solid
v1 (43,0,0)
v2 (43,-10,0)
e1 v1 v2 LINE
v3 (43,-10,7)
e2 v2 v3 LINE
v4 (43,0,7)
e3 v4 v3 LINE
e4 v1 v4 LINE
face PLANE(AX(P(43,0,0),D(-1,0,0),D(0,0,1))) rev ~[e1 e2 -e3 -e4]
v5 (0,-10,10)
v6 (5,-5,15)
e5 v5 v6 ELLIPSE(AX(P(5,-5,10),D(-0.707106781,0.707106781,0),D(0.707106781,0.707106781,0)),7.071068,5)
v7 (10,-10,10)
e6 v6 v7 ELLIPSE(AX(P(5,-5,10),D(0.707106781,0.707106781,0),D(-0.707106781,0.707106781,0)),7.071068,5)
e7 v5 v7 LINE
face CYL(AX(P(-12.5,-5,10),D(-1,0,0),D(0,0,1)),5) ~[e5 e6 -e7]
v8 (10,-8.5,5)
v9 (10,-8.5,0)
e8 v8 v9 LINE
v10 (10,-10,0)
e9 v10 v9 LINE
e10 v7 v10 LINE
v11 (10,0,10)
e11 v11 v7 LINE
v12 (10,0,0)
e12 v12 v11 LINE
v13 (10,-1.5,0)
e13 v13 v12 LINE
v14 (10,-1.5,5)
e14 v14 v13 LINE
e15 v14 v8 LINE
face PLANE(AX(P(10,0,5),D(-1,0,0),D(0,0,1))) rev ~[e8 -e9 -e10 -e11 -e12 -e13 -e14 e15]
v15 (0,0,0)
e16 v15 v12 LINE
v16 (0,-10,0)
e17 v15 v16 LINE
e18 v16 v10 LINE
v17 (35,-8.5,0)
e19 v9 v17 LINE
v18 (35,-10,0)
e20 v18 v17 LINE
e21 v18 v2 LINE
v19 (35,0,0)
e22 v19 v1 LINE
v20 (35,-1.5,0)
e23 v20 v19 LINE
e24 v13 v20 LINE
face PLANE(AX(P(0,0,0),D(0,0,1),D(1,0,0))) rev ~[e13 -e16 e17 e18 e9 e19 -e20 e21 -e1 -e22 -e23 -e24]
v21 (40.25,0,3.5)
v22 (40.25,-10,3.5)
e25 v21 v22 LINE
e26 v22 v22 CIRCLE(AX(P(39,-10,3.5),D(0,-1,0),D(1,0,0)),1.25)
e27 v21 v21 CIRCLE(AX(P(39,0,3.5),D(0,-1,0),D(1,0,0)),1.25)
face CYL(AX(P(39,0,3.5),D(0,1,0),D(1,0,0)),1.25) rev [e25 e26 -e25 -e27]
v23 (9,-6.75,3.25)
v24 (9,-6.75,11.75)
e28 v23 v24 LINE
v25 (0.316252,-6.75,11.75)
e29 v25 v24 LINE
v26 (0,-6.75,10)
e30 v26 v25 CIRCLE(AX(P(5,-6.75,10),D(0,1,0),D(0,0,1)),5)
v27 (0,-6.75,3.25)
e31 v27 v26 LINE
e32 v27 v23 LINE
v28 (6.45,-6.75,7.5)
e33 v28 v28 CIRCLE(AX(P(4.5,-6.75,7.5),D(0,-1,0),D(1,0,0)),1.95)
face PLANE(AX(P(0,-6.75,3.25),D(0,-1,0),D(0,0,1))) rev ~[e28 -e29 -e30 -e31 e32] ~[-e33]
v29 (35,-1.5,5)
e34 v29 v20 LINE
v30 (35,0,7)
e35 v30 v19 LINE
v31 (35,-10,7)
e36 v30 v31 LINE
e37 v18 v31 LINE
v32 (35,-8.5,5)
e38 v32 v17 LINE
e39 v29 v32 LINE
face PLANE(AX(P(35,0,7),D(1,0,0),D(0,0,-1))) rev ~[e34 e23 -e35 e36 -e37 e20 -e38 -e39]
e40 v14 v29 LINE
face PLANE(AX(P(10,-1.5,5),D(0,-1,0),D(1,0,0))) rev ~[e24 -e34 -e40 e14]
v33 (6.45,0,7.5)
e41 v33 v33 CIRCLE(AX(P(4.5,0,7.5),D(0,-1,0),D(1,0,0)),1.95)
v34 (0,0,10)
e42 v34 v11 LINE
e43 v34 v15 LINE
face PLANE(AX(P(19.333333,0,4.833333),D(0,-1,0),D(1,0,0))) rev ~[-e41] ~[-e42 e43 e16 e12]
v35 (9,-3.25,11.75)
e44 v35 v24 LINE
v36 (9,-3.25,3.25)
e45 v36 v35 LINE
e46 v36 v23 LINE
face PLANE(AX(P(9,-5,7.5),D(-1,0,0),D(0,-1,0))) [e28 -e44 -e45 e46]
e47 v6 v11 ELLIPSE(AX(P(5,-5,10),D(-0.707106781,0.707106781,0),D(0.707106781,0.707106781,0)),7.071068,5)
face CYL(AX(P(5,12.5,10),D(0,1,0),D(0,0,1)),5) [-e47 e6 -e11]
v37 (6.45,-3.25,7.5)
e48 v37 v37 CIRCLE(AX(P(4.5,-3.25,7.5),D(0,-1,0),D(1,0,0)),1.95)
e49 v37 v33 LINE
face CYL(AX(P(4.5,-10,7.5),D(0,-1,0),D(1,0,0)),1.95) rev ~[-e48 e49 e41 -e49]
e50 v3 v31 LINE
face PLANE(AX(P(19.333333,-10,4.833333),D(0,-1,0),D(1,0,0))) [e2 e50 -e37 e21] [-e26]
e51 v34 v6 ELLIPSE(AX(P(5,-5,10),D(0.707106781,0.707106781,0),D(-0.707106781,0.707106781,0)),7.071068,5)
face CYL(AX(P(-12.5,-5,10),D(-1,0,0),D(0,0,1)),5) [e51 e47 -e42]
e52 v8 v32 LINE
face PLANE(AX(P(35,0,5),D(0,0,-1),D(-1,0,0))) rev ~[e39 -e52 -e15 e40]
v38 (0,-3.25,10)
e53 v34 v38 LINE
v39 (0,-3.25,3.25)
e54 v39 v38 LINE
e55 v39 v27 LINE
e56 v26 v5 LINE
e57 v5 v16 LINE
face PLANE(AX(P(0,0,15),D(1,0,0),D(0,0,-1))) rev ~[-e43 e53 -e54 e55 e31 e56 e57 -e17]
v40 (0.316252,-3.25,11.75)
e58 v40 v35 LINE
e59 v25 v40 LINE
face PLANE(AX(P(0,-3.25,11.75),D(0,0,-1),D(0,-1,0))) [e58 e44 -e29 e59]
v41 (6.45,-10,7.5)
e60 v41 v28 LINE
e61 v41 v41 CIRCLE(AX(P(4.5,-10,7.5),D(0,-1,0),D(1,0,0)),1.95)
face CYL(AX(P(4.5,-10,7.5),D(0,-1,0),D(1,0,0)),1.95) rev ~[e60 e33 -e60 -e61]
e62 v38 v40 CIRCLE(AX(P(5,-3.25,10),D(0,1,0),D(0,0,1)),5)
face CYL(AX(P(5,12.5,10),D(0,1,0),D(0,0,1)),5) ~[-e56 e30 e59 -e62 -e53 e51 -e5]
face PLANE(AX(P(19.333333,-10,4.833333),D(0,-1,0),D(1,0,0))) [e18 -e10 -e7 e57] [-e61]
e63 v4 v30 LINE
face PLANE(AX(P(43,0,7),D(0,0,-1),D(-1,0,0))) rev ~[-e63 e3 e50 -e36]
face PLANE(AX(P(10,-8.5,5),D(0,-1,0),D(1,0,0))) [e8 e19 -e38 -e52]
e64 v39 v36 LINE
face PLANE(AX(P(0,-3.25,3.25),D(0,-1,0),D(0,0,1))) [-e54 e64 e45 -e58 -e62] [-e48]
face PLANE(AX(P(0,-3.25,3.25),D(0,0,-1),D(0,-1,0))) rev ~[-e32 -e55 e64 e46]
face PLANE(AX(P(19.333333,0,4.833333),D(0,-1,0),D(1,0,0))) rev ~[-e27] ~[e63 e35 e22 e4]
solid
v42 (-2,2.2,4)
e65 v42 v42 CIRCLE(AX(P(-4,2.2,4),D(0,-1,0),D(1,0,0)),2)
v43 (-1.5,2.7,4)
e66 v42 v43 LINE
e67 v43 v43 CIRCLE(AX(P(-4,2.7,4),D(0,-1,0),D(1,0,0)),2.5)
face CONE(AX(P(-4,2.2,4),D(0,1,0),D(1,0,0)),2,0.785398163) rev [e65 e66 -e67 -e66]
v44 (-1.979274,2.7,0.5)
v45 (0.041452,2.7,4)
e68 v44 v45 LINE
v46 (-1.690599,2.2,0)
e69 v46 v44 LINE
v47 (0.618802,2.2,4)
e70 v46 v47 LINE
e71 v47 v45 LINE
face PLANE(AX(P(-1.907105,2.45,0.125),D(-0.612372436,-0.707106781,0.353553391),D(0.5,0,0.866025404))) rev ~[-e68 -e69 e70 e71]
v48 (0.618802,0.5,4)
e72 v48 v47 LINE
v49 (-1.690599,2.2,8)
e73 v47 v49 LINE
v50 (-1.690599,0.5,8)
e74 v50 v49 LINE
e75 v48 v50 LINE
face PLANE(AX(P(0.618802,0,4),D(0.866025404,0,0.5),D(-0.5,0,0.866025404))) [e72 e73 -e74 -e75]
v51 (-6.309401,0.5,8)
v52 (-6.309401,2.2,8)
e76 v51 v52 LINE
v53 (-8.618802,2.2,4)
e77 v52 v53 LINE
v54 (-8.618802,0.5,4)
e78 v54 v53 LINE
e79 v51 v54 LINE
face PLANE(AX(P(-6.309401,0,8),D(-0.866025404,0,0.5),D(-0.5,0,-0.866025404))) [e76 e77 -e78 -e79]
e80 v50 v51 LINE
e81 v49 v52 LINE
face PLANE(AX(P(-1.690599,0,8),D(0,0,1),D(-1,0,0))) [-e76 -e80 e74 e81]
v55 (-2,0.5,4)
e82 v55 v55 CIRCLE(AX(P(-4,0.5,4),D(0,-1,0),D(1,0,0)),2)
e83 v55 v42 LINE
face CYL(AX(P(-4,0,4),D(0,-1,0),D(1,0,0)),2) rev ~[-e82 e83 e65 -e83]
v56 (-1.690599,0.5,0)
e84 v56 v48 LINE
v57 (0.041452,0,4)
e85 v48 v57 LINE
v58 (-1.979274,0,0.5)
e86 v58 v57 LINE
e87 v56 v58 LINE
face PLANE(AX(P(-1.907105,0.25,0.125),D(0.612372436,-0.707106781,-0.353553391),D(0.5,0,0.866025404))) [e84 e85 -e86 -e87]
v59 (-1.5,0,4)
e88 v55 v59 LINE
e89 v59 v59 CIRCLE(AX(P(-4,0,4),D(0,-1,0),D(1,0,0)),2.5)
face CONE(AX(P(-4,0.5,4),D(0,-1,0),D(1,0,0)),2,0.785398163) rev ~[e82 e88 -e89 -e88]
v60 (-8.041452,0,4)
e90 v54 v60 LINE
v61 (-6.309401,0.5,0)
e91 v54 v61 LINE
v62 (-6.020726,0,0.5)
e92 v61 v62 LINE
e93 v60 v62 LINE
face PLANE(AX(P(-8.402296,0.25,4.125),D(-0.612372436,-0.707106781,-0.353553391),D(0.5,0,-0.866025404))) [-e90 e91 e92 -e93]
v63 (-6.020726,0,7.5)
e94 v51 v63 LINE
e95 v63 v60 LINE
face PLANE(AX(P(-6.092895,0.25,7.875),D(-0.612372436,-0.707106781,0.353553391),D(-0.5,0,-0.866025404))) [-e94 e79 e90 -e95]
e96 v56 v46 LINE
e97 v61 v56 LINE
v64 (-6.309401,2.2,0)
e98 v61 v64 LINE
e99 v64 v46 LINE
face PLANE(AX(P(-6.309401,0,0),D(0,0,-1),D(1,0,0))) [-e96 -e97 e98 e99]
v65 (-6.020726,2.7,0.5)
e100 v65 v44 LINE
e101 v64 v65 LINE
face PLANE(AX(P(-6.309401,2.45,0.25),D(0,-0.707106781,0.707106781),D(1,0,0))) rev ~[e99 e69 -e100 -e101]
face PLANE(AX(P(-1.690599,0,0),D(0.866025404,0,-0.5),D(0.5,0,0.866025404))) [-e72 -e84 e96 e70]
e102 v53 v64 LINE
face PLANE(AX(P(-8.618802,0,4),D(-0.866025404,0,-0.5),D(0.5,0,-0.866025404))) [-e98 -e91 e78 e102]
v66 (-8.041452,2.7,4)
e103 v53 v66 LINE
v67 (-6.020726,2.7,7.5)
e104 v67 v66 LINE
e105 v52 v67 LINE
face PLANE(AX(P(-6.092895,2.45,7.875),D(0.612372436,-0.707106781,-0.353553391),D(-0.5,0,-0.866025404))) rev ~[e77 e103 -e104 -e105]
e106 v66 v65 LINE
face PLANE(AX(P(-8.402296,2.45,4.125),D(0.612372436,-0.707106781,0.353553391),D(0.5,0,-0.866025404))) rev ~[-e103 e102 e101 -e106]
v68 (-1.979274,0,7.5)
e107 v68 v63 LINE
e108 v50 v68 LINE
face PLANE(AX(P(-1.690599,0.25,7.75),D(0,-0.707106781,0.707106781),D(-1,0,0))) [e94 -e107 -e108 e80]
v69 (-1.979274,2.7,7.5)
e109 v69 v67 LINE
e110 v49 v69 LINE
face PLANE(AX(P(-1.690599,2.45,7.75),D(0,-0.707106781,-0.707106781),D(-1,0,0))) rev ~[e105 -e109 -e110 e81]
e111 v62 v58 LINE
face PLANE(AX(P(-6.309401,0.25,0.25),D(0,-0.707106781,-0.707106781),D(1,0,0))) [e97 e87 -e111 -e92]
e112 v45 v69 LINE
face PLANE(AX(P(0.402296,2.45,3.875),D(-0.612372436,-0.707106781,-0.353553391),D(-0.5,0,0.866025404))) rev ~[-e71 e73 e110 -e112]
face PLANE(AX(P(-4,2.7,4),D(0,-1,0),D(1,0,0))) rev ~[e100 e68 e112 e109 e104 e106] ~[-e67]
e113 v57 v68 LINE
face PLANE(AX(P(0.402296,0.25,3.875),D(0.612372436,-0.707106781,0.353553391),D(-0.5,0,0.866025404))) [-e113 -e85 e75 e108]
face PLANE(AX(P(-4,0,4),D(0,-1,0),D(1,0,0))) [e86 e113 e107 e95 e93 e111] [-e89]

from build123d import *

# Parameters (mm, degrees)
F0_R        = 1.25
F1_DEPTH    = 10
F2_W        = 3.5
F2_H        = 8.5
F3_DEPTH    = 9
F4_R        = 1.95
F5_DEPTH    = 10
F6_T1_DEPTH = 35
F6_T3_DEPTH = 35
F7_W        = 25
F7_H        = 1.5
F8_DEPTH    = 5
F9_R        = 2
F10_DEPTH   = 2.7
F11_SIZE    = 0.5


# Not quite as in the source:
# - a fillet or chamfer that OpenCascade refuses, or shapes differently, is made with other operations: its cross-section is extruded or revolved along the edge and cut away or added


with BuildPart() as f1:
    # F0 (on Front) → F1 (new body)
    with BuildSketch(Plane.XZ):
        Polygon((10, 15), (0, 15), (0, 0), (43, 0), (43, 7), (35, 7), (35, 5), (10, 5), align=None)
        with Locations((39, 3.5)):
            Circle(F0_R, mode=Mode.SUBTRACT)
    extrude(amount=F1_DEPTH)

    # F2 (on face) → F3 (cut)
    with BuildSketch(Plane(origin=(0, 0, 0), x_dir=(0, -1, 0), z_dir=(-1, 0, 0))):
        with Locations((5, 7.5)):
            Rectangle(F2_W, F2_H)
    extrude(amount=-F3_DEPTH, mode=Mode.SUBTRACT)

    # F4 (on face) → F5 (cut, through all)
    with BuildSketch(Plane.XZ.offset(10)):
        with Locations((4.5, 7.5)):
            Circle(F4_R)
    extrude(amount=-F5_DEPTH, mode=Mode.SUBTRACT)

    # F6: fillet of radius 5 on 4 edges, made by hand

    # F6_s2 → F6_t1 (cut)
    with BuildSketch(Plane.XZ.offset(-12.5)):
        with BuildLine():
            ThreePointArc((5, 15), (8.5355339059, 13.5355339059), (10, 10))
            Line((10, 10), (10, 15))
            Line((10, 15), (5, 15))
        make_face()
        with BuildLine():
            ThreePointArc((5, 15), (1.4644660941, 13.5355339059), (0, 10))
            Line((0, 10), (0, 15))
            Line((0, 15), (5, 15))
        make_face()
    extrude(amount=F6_T1_DEPTH, mode=Mode.SUBTRACT)

    # F6_s4 → F6_t3 (cut)
    with BuildSketch(Plane.YZ.offset(-12.5)):
        with BuildLine():
            ThreePointArc((-5, 15), (-1.4644660941, 13.5355339059), (0, 10))
            Line((0, 10), (0, 15))
            Line((0, 15), (-5, 15))
        make_face()
        with BuildLine():
            ThreePointArc((-5, 15), (-8.5355339059, 13.5355339059), (-10, 10))
            Line((-10, 10), (-10, 15))
            Line((-10, 15), (-5, 15))
        make_face()
    extrude(amount=F6_T3_DEPTH, mode=Mode.SUBTRACT)

    # F7 (on face) → F8 (cut, through all)
    with BuildSketch(Plane.XY.offset(5)):
        with Locations((22.5, -0.75)):
            Rectangle(F7_W, F7_H)
        with Locations((22.5, -9.25)):
            Rectangle(F7_W, F7_H)
    extrude(amount=-F8_DEPTH, mode=Mode.SUBTRACT)


with BuildPart() as f10:
    # F9 (on Front) → F10 (new body)
    with BuildSketch(Plane.XZ):
        Polygon((-8.6188021535, 4), (-6.3094010768, 0), (-1.6905989232, 0), (0.6188021535, 4), (-1.6905989232, 8), (-6.3094010768, 8), align=None)
        with Locations((-4, 4)):
            Circle(F9_R, mode=Mode.SUBTRACT)
    extrude(amount=-F10_DEPTH)

    # F11
    f11_edges = [f10.edges().sort_by_distance(p)[0] for p in [
        (-7.464102, 2.7, 2),
        (-4, 2.7, 0),
        (-0.535898, 2.7, 2),
        (-0.535898, 2.7, 6),
        (-4, 2.7, 8),
        (-7.464102, 2.7, 6),
        (-6, 2.7, 4),
        (-7.464102, 0, 2),
        (-4, 0, 0),
        (-0.535898, 0, 2),
        (-0.535898, 0, 6),
        (-4, 0, 8),
        (-7.464102, 0, 6),
        (-6, 0, 4),
    ]]
    chamfer(f11_edges, length=F11_SIZE)


solid = Compound([f1.part, f10.part])
